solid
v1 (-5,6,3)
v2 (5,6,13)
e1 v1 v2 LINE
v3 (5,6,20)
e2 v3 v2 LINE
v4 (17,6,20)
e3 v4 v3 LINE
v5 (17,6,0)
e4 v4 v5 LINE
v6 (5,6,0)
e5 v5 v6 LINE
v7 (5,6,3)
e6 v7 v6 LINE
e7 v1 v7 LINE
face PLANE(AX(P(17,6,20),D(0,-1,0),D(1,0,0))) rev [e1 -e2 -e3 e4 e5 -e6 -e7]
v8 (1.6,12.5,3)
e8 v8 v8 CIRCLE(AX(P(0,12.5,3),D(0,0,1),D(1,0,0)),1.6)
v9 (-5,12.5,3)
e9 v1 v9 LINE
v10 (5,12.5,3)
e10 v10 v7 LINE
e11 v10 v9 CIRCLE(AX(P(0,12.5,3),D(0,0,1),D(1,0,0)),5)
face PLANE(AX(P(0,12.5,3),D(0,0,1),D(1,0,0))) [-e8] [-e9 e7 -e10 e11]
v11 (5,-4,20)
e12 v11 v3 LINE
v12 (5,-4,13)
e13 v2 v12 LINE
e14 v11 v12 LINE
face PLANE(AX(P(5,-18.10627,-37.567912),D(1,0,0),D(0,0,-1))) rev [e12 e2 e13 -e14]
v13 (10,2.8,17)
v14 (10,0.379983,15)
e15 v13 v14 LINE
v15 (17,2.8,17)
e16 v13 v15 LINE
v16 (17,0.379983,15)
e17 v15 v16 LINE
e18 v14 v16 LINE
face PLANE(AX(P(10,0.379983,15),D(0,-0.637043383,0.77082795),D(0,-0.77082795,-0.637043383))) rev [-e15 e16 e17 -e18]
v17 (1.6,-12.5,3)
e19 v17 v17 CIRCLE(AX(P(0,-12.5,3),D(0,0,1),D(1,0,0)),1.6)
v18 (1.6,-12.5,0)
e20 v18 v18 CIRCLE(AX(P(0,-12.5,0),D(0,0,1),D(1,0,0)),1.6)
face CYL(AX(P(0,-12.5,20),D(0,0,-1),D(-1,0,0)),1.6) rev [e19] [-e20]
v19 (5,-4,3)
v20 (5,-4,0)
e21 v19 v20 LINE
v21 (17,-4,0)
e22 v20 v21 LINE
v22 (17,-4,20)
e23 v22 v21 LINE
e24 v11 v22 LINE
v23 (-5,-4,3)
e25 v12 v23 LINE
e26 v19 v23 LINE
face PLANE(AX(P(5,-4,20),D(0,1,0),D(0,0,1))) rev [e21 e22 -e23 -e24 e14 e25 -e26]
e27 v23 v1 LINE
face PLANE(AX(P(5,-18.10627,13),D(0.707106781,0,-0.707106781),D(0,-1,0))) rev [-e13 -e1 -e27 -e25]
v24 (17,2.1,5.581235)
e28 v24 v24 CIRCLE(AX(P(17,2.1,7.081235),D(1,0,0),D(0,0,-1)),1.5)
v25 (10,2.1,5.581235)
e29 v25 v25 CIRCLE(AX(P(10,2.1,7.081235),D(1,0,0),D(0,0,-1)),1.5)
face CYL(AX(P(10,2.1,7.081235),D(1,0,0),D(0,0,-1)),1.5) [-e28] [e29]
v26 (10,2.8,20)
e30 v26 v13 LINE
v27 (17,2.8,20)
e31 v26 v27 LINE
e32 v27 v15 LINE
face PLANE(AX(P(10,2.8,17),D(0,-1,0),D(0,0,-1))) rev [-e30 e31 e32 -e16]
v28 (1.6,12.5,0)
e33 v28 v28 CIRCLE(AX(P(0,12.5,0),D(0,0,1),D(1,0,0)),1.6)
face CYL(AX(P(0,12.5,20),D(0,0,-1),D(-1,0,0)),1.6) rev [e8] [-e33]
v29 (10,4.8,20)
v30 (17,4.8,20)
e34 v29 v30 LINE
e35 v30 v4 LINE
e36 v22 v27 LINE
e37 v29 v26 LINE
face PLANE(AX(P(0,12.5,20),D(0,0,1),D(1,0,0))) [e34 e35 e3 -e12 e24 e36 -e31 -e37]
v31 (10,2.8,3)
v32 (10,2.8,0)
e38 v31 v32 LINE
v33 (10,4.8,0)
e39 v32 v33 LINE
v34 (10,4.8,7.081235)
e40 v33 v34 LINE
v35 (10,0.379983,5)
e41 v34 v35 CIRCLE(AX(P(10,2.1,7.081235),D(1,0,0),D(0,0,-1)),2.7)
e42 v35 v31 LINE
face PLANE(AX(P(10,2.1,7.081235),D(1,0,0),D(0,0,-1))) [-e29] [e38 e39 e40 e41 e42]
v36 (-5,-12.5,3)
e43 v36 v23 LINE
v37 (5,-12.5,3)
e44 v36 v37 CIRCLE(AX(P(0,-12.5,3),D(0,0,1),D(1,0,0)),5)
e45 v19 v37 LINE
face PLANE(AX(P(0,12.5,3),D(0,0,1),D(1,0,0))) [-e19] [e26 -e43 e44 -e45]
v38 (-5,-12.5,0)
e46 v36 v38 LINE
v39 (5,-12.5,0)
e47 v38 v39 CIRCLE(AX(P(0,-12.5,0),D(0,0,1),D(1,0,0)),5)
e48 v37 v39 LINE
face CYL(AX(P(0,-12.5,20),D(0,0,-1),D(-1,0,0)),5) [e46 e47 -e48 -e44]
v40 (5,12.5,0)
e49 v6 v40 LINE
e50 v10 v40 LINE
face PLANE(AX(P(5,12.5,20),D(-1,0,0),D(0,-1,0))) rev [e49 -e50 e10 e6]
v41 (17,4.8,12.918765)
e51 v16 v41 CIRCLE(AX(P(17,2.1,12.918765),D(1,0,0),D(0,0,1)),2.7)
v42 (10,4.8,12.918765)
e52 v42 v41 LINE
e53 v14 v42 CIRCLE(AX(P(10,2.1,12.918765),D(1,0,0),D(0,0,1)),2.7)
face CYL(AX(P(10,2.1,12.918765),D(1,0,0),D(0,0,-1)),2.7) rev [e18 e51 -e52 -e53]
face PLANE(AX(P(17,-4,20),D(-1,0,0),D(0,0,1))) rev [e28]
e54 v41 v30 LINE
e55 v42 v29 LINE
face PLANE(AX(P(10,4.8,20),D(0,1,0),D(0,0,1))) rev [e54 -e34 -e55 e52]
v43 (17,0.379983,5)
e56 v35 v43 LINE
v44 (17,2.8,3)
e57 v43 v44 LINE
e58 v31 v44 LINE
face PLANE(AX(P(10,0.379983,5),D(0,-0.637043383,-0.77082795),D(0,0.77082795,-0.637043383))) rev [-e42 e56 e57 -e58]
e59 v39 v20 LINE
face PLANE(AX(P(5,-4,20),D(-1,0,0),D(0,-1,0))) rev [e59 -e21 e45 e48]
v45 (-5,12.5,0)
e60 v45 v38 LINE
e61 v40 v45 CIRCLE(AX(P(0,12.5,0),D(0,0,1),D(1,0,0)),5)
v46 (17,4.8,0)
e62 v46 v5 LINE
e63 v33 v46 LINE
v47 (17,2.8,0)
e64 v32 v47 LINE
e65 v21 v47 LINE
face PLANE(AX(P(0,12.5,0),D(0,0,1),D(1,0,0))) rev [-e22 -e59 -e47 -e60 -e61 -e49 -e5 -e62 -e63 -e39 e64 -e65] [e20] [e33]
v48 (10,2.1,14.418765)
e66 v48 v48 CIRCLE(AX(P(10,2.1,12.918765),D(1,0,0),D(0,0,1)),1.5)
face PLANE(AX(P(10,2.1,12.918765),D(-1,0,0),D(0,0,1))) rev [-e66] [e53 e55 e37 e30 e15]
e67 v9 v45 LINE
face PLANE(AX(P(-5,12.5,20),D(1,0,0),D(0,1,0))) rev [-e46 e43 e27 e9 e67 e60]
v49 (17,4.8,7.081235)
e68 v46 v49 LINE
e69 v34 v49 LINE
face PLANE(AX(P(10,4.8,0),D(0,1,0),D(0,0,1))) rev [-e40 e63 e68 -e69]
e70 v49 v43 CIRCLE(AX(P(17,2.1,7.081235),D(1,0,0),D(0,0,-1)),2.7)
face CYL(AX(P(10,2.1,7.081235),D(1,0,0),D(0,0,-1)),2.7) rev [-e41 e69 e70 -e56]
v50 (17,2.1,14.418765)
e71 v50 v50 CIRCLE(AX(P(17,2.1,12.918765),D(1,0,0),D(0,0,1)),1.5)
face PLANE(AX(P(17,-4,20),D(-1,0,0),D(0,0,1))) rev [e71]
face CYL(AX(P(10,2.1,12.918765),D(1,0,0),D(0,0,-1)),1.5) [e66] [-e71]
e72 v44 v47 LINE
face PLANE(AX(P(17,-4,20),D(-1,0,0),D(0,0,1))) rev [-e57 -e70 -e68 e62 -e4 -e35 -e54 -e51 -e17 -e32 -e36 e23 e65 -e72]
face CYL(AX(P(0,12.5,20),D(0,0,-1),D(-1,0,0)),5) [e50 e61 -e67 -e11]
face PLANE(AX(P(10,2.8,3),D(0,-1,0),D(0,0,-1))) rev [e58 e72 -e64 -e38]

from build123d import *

# Parameters (mm, degrees)
ESBO_O1_R                = 1.6
RESSALTO_EXTRUS_O1_DEPTH = 20
ESBO_O2_W                = 10
ESBO_O2_H                = 36.212539342
CORTE_EXTRUS_O1_DEPTH    = 17
CHANFRO1_SIZE            = 10
ESBO_O3_R                = 1.5
CORTE_EXTRUS_O2_DEPTH    = 7


with BuildPart() as part:
    # Esboço1 → Ressalto-extrusão1 (new body)
    with BuildSketch(Plane.XY):
        with BuildLine():
            Line((5, 12.5), (5, 6))
            Line((5, 6), (17, 6))
            Line((17, 6), (17, -4))
            Line((17, -4), (5, -4))
            Line((5, -4), (5, -12.5))
            ThreePointArc((5, -12.5), (0, -17.5), (-5, -12.5))
            Line((-5, -12.5), (-5, 12.5))
            ThreePointArc((-5, 12.5), (0, 17.5), (5, 12.5))
        make_face()
        with Locations((0, -12.5)):
            Circle(ESBO_O1_R, mode=Mode.SUBTRACT)
        with Locations((0, 12.5)):
            Circle(ESBO_O1_R, mode=Mode.SUBTRACT)
    extrude(amount=RESSALTO_EXTRUS_O1_DEPTH)

    # Esboço2 → Corte-extrusão1 (cut)
    with BuildSketch(Plane.XY.offset(20)):
        Rectangle(ESBO_O2_W, ESBO_O2_H)
    extrude(amount=-CORTE_EXTRUS_O1_DEPTH, mode=Mode.SUBTRACT)

    # Chanfro1
    chanfro1_edges = [part.edges().sort_by_distance(p)[0] for p in [
        (5, 1, 3),
    ]]
    chamfer(chanfro1_edges, length=CHANFRO1_SIZE - 0.0001)  # a hair under: the kernel refuses the full size

    # Esboço3 → Corte-extrusão2 (cut)
    # profile 1 of 2: a face of its own
    with BuildSketch(Plane(origin=(17, 0, 0), x_dir=(0, 0, -1), z_dir=(1, 0, 0))):
        with BuildLine():
            Line((0, 4.8), (-7.081235465, 4.8))
            ThreePointArc((-7.081235465, 4.8), (-9.523984558, 0.949792684), (-5, 0.379982867))
            Line((-5, 0.379982867), (-3, 2.8))
            Line((-3, 2.8), (0, 2.8))
            Line((0, 2.8), (0, 4.8))
        make_face()
        with Locations((-7.081235465, 2.1)):
            Circle(ESBO_O3_R, mode=Mode.SUBTRACT)
    # profile 2 of 2: a face of its own
    with BuildSketch(Plane(origin=(17, 0, 0), x_dir=(0, 0, -1), z_dir=(1, 0, 0))):
        with BuildLine():
            Line((-20, 4.8), (-20, 2.8))
            Line((-20, 2.8), (-17, 2.8))
            Line((-17, 2.8), (-15, 0.379982867))
            ThreePointArc((-15, 0.379982867), (-10.476015442, 0.949792684), (-12.918764535, 4.8))
            Line((-12.918764535, 4.8), (-20, 4.8))
        make_face()
        with Locations(Location((-12.918764535, 2.1, 0), (0, 0, 180))):
            Circle(ESBO_O3_R, mode=Mode.SUBTRACT)
    extrude(amount=-CORTE_EXTRUS_O2_DEPTH, mode=Mode.SUBTRACT)


solid = part.part
